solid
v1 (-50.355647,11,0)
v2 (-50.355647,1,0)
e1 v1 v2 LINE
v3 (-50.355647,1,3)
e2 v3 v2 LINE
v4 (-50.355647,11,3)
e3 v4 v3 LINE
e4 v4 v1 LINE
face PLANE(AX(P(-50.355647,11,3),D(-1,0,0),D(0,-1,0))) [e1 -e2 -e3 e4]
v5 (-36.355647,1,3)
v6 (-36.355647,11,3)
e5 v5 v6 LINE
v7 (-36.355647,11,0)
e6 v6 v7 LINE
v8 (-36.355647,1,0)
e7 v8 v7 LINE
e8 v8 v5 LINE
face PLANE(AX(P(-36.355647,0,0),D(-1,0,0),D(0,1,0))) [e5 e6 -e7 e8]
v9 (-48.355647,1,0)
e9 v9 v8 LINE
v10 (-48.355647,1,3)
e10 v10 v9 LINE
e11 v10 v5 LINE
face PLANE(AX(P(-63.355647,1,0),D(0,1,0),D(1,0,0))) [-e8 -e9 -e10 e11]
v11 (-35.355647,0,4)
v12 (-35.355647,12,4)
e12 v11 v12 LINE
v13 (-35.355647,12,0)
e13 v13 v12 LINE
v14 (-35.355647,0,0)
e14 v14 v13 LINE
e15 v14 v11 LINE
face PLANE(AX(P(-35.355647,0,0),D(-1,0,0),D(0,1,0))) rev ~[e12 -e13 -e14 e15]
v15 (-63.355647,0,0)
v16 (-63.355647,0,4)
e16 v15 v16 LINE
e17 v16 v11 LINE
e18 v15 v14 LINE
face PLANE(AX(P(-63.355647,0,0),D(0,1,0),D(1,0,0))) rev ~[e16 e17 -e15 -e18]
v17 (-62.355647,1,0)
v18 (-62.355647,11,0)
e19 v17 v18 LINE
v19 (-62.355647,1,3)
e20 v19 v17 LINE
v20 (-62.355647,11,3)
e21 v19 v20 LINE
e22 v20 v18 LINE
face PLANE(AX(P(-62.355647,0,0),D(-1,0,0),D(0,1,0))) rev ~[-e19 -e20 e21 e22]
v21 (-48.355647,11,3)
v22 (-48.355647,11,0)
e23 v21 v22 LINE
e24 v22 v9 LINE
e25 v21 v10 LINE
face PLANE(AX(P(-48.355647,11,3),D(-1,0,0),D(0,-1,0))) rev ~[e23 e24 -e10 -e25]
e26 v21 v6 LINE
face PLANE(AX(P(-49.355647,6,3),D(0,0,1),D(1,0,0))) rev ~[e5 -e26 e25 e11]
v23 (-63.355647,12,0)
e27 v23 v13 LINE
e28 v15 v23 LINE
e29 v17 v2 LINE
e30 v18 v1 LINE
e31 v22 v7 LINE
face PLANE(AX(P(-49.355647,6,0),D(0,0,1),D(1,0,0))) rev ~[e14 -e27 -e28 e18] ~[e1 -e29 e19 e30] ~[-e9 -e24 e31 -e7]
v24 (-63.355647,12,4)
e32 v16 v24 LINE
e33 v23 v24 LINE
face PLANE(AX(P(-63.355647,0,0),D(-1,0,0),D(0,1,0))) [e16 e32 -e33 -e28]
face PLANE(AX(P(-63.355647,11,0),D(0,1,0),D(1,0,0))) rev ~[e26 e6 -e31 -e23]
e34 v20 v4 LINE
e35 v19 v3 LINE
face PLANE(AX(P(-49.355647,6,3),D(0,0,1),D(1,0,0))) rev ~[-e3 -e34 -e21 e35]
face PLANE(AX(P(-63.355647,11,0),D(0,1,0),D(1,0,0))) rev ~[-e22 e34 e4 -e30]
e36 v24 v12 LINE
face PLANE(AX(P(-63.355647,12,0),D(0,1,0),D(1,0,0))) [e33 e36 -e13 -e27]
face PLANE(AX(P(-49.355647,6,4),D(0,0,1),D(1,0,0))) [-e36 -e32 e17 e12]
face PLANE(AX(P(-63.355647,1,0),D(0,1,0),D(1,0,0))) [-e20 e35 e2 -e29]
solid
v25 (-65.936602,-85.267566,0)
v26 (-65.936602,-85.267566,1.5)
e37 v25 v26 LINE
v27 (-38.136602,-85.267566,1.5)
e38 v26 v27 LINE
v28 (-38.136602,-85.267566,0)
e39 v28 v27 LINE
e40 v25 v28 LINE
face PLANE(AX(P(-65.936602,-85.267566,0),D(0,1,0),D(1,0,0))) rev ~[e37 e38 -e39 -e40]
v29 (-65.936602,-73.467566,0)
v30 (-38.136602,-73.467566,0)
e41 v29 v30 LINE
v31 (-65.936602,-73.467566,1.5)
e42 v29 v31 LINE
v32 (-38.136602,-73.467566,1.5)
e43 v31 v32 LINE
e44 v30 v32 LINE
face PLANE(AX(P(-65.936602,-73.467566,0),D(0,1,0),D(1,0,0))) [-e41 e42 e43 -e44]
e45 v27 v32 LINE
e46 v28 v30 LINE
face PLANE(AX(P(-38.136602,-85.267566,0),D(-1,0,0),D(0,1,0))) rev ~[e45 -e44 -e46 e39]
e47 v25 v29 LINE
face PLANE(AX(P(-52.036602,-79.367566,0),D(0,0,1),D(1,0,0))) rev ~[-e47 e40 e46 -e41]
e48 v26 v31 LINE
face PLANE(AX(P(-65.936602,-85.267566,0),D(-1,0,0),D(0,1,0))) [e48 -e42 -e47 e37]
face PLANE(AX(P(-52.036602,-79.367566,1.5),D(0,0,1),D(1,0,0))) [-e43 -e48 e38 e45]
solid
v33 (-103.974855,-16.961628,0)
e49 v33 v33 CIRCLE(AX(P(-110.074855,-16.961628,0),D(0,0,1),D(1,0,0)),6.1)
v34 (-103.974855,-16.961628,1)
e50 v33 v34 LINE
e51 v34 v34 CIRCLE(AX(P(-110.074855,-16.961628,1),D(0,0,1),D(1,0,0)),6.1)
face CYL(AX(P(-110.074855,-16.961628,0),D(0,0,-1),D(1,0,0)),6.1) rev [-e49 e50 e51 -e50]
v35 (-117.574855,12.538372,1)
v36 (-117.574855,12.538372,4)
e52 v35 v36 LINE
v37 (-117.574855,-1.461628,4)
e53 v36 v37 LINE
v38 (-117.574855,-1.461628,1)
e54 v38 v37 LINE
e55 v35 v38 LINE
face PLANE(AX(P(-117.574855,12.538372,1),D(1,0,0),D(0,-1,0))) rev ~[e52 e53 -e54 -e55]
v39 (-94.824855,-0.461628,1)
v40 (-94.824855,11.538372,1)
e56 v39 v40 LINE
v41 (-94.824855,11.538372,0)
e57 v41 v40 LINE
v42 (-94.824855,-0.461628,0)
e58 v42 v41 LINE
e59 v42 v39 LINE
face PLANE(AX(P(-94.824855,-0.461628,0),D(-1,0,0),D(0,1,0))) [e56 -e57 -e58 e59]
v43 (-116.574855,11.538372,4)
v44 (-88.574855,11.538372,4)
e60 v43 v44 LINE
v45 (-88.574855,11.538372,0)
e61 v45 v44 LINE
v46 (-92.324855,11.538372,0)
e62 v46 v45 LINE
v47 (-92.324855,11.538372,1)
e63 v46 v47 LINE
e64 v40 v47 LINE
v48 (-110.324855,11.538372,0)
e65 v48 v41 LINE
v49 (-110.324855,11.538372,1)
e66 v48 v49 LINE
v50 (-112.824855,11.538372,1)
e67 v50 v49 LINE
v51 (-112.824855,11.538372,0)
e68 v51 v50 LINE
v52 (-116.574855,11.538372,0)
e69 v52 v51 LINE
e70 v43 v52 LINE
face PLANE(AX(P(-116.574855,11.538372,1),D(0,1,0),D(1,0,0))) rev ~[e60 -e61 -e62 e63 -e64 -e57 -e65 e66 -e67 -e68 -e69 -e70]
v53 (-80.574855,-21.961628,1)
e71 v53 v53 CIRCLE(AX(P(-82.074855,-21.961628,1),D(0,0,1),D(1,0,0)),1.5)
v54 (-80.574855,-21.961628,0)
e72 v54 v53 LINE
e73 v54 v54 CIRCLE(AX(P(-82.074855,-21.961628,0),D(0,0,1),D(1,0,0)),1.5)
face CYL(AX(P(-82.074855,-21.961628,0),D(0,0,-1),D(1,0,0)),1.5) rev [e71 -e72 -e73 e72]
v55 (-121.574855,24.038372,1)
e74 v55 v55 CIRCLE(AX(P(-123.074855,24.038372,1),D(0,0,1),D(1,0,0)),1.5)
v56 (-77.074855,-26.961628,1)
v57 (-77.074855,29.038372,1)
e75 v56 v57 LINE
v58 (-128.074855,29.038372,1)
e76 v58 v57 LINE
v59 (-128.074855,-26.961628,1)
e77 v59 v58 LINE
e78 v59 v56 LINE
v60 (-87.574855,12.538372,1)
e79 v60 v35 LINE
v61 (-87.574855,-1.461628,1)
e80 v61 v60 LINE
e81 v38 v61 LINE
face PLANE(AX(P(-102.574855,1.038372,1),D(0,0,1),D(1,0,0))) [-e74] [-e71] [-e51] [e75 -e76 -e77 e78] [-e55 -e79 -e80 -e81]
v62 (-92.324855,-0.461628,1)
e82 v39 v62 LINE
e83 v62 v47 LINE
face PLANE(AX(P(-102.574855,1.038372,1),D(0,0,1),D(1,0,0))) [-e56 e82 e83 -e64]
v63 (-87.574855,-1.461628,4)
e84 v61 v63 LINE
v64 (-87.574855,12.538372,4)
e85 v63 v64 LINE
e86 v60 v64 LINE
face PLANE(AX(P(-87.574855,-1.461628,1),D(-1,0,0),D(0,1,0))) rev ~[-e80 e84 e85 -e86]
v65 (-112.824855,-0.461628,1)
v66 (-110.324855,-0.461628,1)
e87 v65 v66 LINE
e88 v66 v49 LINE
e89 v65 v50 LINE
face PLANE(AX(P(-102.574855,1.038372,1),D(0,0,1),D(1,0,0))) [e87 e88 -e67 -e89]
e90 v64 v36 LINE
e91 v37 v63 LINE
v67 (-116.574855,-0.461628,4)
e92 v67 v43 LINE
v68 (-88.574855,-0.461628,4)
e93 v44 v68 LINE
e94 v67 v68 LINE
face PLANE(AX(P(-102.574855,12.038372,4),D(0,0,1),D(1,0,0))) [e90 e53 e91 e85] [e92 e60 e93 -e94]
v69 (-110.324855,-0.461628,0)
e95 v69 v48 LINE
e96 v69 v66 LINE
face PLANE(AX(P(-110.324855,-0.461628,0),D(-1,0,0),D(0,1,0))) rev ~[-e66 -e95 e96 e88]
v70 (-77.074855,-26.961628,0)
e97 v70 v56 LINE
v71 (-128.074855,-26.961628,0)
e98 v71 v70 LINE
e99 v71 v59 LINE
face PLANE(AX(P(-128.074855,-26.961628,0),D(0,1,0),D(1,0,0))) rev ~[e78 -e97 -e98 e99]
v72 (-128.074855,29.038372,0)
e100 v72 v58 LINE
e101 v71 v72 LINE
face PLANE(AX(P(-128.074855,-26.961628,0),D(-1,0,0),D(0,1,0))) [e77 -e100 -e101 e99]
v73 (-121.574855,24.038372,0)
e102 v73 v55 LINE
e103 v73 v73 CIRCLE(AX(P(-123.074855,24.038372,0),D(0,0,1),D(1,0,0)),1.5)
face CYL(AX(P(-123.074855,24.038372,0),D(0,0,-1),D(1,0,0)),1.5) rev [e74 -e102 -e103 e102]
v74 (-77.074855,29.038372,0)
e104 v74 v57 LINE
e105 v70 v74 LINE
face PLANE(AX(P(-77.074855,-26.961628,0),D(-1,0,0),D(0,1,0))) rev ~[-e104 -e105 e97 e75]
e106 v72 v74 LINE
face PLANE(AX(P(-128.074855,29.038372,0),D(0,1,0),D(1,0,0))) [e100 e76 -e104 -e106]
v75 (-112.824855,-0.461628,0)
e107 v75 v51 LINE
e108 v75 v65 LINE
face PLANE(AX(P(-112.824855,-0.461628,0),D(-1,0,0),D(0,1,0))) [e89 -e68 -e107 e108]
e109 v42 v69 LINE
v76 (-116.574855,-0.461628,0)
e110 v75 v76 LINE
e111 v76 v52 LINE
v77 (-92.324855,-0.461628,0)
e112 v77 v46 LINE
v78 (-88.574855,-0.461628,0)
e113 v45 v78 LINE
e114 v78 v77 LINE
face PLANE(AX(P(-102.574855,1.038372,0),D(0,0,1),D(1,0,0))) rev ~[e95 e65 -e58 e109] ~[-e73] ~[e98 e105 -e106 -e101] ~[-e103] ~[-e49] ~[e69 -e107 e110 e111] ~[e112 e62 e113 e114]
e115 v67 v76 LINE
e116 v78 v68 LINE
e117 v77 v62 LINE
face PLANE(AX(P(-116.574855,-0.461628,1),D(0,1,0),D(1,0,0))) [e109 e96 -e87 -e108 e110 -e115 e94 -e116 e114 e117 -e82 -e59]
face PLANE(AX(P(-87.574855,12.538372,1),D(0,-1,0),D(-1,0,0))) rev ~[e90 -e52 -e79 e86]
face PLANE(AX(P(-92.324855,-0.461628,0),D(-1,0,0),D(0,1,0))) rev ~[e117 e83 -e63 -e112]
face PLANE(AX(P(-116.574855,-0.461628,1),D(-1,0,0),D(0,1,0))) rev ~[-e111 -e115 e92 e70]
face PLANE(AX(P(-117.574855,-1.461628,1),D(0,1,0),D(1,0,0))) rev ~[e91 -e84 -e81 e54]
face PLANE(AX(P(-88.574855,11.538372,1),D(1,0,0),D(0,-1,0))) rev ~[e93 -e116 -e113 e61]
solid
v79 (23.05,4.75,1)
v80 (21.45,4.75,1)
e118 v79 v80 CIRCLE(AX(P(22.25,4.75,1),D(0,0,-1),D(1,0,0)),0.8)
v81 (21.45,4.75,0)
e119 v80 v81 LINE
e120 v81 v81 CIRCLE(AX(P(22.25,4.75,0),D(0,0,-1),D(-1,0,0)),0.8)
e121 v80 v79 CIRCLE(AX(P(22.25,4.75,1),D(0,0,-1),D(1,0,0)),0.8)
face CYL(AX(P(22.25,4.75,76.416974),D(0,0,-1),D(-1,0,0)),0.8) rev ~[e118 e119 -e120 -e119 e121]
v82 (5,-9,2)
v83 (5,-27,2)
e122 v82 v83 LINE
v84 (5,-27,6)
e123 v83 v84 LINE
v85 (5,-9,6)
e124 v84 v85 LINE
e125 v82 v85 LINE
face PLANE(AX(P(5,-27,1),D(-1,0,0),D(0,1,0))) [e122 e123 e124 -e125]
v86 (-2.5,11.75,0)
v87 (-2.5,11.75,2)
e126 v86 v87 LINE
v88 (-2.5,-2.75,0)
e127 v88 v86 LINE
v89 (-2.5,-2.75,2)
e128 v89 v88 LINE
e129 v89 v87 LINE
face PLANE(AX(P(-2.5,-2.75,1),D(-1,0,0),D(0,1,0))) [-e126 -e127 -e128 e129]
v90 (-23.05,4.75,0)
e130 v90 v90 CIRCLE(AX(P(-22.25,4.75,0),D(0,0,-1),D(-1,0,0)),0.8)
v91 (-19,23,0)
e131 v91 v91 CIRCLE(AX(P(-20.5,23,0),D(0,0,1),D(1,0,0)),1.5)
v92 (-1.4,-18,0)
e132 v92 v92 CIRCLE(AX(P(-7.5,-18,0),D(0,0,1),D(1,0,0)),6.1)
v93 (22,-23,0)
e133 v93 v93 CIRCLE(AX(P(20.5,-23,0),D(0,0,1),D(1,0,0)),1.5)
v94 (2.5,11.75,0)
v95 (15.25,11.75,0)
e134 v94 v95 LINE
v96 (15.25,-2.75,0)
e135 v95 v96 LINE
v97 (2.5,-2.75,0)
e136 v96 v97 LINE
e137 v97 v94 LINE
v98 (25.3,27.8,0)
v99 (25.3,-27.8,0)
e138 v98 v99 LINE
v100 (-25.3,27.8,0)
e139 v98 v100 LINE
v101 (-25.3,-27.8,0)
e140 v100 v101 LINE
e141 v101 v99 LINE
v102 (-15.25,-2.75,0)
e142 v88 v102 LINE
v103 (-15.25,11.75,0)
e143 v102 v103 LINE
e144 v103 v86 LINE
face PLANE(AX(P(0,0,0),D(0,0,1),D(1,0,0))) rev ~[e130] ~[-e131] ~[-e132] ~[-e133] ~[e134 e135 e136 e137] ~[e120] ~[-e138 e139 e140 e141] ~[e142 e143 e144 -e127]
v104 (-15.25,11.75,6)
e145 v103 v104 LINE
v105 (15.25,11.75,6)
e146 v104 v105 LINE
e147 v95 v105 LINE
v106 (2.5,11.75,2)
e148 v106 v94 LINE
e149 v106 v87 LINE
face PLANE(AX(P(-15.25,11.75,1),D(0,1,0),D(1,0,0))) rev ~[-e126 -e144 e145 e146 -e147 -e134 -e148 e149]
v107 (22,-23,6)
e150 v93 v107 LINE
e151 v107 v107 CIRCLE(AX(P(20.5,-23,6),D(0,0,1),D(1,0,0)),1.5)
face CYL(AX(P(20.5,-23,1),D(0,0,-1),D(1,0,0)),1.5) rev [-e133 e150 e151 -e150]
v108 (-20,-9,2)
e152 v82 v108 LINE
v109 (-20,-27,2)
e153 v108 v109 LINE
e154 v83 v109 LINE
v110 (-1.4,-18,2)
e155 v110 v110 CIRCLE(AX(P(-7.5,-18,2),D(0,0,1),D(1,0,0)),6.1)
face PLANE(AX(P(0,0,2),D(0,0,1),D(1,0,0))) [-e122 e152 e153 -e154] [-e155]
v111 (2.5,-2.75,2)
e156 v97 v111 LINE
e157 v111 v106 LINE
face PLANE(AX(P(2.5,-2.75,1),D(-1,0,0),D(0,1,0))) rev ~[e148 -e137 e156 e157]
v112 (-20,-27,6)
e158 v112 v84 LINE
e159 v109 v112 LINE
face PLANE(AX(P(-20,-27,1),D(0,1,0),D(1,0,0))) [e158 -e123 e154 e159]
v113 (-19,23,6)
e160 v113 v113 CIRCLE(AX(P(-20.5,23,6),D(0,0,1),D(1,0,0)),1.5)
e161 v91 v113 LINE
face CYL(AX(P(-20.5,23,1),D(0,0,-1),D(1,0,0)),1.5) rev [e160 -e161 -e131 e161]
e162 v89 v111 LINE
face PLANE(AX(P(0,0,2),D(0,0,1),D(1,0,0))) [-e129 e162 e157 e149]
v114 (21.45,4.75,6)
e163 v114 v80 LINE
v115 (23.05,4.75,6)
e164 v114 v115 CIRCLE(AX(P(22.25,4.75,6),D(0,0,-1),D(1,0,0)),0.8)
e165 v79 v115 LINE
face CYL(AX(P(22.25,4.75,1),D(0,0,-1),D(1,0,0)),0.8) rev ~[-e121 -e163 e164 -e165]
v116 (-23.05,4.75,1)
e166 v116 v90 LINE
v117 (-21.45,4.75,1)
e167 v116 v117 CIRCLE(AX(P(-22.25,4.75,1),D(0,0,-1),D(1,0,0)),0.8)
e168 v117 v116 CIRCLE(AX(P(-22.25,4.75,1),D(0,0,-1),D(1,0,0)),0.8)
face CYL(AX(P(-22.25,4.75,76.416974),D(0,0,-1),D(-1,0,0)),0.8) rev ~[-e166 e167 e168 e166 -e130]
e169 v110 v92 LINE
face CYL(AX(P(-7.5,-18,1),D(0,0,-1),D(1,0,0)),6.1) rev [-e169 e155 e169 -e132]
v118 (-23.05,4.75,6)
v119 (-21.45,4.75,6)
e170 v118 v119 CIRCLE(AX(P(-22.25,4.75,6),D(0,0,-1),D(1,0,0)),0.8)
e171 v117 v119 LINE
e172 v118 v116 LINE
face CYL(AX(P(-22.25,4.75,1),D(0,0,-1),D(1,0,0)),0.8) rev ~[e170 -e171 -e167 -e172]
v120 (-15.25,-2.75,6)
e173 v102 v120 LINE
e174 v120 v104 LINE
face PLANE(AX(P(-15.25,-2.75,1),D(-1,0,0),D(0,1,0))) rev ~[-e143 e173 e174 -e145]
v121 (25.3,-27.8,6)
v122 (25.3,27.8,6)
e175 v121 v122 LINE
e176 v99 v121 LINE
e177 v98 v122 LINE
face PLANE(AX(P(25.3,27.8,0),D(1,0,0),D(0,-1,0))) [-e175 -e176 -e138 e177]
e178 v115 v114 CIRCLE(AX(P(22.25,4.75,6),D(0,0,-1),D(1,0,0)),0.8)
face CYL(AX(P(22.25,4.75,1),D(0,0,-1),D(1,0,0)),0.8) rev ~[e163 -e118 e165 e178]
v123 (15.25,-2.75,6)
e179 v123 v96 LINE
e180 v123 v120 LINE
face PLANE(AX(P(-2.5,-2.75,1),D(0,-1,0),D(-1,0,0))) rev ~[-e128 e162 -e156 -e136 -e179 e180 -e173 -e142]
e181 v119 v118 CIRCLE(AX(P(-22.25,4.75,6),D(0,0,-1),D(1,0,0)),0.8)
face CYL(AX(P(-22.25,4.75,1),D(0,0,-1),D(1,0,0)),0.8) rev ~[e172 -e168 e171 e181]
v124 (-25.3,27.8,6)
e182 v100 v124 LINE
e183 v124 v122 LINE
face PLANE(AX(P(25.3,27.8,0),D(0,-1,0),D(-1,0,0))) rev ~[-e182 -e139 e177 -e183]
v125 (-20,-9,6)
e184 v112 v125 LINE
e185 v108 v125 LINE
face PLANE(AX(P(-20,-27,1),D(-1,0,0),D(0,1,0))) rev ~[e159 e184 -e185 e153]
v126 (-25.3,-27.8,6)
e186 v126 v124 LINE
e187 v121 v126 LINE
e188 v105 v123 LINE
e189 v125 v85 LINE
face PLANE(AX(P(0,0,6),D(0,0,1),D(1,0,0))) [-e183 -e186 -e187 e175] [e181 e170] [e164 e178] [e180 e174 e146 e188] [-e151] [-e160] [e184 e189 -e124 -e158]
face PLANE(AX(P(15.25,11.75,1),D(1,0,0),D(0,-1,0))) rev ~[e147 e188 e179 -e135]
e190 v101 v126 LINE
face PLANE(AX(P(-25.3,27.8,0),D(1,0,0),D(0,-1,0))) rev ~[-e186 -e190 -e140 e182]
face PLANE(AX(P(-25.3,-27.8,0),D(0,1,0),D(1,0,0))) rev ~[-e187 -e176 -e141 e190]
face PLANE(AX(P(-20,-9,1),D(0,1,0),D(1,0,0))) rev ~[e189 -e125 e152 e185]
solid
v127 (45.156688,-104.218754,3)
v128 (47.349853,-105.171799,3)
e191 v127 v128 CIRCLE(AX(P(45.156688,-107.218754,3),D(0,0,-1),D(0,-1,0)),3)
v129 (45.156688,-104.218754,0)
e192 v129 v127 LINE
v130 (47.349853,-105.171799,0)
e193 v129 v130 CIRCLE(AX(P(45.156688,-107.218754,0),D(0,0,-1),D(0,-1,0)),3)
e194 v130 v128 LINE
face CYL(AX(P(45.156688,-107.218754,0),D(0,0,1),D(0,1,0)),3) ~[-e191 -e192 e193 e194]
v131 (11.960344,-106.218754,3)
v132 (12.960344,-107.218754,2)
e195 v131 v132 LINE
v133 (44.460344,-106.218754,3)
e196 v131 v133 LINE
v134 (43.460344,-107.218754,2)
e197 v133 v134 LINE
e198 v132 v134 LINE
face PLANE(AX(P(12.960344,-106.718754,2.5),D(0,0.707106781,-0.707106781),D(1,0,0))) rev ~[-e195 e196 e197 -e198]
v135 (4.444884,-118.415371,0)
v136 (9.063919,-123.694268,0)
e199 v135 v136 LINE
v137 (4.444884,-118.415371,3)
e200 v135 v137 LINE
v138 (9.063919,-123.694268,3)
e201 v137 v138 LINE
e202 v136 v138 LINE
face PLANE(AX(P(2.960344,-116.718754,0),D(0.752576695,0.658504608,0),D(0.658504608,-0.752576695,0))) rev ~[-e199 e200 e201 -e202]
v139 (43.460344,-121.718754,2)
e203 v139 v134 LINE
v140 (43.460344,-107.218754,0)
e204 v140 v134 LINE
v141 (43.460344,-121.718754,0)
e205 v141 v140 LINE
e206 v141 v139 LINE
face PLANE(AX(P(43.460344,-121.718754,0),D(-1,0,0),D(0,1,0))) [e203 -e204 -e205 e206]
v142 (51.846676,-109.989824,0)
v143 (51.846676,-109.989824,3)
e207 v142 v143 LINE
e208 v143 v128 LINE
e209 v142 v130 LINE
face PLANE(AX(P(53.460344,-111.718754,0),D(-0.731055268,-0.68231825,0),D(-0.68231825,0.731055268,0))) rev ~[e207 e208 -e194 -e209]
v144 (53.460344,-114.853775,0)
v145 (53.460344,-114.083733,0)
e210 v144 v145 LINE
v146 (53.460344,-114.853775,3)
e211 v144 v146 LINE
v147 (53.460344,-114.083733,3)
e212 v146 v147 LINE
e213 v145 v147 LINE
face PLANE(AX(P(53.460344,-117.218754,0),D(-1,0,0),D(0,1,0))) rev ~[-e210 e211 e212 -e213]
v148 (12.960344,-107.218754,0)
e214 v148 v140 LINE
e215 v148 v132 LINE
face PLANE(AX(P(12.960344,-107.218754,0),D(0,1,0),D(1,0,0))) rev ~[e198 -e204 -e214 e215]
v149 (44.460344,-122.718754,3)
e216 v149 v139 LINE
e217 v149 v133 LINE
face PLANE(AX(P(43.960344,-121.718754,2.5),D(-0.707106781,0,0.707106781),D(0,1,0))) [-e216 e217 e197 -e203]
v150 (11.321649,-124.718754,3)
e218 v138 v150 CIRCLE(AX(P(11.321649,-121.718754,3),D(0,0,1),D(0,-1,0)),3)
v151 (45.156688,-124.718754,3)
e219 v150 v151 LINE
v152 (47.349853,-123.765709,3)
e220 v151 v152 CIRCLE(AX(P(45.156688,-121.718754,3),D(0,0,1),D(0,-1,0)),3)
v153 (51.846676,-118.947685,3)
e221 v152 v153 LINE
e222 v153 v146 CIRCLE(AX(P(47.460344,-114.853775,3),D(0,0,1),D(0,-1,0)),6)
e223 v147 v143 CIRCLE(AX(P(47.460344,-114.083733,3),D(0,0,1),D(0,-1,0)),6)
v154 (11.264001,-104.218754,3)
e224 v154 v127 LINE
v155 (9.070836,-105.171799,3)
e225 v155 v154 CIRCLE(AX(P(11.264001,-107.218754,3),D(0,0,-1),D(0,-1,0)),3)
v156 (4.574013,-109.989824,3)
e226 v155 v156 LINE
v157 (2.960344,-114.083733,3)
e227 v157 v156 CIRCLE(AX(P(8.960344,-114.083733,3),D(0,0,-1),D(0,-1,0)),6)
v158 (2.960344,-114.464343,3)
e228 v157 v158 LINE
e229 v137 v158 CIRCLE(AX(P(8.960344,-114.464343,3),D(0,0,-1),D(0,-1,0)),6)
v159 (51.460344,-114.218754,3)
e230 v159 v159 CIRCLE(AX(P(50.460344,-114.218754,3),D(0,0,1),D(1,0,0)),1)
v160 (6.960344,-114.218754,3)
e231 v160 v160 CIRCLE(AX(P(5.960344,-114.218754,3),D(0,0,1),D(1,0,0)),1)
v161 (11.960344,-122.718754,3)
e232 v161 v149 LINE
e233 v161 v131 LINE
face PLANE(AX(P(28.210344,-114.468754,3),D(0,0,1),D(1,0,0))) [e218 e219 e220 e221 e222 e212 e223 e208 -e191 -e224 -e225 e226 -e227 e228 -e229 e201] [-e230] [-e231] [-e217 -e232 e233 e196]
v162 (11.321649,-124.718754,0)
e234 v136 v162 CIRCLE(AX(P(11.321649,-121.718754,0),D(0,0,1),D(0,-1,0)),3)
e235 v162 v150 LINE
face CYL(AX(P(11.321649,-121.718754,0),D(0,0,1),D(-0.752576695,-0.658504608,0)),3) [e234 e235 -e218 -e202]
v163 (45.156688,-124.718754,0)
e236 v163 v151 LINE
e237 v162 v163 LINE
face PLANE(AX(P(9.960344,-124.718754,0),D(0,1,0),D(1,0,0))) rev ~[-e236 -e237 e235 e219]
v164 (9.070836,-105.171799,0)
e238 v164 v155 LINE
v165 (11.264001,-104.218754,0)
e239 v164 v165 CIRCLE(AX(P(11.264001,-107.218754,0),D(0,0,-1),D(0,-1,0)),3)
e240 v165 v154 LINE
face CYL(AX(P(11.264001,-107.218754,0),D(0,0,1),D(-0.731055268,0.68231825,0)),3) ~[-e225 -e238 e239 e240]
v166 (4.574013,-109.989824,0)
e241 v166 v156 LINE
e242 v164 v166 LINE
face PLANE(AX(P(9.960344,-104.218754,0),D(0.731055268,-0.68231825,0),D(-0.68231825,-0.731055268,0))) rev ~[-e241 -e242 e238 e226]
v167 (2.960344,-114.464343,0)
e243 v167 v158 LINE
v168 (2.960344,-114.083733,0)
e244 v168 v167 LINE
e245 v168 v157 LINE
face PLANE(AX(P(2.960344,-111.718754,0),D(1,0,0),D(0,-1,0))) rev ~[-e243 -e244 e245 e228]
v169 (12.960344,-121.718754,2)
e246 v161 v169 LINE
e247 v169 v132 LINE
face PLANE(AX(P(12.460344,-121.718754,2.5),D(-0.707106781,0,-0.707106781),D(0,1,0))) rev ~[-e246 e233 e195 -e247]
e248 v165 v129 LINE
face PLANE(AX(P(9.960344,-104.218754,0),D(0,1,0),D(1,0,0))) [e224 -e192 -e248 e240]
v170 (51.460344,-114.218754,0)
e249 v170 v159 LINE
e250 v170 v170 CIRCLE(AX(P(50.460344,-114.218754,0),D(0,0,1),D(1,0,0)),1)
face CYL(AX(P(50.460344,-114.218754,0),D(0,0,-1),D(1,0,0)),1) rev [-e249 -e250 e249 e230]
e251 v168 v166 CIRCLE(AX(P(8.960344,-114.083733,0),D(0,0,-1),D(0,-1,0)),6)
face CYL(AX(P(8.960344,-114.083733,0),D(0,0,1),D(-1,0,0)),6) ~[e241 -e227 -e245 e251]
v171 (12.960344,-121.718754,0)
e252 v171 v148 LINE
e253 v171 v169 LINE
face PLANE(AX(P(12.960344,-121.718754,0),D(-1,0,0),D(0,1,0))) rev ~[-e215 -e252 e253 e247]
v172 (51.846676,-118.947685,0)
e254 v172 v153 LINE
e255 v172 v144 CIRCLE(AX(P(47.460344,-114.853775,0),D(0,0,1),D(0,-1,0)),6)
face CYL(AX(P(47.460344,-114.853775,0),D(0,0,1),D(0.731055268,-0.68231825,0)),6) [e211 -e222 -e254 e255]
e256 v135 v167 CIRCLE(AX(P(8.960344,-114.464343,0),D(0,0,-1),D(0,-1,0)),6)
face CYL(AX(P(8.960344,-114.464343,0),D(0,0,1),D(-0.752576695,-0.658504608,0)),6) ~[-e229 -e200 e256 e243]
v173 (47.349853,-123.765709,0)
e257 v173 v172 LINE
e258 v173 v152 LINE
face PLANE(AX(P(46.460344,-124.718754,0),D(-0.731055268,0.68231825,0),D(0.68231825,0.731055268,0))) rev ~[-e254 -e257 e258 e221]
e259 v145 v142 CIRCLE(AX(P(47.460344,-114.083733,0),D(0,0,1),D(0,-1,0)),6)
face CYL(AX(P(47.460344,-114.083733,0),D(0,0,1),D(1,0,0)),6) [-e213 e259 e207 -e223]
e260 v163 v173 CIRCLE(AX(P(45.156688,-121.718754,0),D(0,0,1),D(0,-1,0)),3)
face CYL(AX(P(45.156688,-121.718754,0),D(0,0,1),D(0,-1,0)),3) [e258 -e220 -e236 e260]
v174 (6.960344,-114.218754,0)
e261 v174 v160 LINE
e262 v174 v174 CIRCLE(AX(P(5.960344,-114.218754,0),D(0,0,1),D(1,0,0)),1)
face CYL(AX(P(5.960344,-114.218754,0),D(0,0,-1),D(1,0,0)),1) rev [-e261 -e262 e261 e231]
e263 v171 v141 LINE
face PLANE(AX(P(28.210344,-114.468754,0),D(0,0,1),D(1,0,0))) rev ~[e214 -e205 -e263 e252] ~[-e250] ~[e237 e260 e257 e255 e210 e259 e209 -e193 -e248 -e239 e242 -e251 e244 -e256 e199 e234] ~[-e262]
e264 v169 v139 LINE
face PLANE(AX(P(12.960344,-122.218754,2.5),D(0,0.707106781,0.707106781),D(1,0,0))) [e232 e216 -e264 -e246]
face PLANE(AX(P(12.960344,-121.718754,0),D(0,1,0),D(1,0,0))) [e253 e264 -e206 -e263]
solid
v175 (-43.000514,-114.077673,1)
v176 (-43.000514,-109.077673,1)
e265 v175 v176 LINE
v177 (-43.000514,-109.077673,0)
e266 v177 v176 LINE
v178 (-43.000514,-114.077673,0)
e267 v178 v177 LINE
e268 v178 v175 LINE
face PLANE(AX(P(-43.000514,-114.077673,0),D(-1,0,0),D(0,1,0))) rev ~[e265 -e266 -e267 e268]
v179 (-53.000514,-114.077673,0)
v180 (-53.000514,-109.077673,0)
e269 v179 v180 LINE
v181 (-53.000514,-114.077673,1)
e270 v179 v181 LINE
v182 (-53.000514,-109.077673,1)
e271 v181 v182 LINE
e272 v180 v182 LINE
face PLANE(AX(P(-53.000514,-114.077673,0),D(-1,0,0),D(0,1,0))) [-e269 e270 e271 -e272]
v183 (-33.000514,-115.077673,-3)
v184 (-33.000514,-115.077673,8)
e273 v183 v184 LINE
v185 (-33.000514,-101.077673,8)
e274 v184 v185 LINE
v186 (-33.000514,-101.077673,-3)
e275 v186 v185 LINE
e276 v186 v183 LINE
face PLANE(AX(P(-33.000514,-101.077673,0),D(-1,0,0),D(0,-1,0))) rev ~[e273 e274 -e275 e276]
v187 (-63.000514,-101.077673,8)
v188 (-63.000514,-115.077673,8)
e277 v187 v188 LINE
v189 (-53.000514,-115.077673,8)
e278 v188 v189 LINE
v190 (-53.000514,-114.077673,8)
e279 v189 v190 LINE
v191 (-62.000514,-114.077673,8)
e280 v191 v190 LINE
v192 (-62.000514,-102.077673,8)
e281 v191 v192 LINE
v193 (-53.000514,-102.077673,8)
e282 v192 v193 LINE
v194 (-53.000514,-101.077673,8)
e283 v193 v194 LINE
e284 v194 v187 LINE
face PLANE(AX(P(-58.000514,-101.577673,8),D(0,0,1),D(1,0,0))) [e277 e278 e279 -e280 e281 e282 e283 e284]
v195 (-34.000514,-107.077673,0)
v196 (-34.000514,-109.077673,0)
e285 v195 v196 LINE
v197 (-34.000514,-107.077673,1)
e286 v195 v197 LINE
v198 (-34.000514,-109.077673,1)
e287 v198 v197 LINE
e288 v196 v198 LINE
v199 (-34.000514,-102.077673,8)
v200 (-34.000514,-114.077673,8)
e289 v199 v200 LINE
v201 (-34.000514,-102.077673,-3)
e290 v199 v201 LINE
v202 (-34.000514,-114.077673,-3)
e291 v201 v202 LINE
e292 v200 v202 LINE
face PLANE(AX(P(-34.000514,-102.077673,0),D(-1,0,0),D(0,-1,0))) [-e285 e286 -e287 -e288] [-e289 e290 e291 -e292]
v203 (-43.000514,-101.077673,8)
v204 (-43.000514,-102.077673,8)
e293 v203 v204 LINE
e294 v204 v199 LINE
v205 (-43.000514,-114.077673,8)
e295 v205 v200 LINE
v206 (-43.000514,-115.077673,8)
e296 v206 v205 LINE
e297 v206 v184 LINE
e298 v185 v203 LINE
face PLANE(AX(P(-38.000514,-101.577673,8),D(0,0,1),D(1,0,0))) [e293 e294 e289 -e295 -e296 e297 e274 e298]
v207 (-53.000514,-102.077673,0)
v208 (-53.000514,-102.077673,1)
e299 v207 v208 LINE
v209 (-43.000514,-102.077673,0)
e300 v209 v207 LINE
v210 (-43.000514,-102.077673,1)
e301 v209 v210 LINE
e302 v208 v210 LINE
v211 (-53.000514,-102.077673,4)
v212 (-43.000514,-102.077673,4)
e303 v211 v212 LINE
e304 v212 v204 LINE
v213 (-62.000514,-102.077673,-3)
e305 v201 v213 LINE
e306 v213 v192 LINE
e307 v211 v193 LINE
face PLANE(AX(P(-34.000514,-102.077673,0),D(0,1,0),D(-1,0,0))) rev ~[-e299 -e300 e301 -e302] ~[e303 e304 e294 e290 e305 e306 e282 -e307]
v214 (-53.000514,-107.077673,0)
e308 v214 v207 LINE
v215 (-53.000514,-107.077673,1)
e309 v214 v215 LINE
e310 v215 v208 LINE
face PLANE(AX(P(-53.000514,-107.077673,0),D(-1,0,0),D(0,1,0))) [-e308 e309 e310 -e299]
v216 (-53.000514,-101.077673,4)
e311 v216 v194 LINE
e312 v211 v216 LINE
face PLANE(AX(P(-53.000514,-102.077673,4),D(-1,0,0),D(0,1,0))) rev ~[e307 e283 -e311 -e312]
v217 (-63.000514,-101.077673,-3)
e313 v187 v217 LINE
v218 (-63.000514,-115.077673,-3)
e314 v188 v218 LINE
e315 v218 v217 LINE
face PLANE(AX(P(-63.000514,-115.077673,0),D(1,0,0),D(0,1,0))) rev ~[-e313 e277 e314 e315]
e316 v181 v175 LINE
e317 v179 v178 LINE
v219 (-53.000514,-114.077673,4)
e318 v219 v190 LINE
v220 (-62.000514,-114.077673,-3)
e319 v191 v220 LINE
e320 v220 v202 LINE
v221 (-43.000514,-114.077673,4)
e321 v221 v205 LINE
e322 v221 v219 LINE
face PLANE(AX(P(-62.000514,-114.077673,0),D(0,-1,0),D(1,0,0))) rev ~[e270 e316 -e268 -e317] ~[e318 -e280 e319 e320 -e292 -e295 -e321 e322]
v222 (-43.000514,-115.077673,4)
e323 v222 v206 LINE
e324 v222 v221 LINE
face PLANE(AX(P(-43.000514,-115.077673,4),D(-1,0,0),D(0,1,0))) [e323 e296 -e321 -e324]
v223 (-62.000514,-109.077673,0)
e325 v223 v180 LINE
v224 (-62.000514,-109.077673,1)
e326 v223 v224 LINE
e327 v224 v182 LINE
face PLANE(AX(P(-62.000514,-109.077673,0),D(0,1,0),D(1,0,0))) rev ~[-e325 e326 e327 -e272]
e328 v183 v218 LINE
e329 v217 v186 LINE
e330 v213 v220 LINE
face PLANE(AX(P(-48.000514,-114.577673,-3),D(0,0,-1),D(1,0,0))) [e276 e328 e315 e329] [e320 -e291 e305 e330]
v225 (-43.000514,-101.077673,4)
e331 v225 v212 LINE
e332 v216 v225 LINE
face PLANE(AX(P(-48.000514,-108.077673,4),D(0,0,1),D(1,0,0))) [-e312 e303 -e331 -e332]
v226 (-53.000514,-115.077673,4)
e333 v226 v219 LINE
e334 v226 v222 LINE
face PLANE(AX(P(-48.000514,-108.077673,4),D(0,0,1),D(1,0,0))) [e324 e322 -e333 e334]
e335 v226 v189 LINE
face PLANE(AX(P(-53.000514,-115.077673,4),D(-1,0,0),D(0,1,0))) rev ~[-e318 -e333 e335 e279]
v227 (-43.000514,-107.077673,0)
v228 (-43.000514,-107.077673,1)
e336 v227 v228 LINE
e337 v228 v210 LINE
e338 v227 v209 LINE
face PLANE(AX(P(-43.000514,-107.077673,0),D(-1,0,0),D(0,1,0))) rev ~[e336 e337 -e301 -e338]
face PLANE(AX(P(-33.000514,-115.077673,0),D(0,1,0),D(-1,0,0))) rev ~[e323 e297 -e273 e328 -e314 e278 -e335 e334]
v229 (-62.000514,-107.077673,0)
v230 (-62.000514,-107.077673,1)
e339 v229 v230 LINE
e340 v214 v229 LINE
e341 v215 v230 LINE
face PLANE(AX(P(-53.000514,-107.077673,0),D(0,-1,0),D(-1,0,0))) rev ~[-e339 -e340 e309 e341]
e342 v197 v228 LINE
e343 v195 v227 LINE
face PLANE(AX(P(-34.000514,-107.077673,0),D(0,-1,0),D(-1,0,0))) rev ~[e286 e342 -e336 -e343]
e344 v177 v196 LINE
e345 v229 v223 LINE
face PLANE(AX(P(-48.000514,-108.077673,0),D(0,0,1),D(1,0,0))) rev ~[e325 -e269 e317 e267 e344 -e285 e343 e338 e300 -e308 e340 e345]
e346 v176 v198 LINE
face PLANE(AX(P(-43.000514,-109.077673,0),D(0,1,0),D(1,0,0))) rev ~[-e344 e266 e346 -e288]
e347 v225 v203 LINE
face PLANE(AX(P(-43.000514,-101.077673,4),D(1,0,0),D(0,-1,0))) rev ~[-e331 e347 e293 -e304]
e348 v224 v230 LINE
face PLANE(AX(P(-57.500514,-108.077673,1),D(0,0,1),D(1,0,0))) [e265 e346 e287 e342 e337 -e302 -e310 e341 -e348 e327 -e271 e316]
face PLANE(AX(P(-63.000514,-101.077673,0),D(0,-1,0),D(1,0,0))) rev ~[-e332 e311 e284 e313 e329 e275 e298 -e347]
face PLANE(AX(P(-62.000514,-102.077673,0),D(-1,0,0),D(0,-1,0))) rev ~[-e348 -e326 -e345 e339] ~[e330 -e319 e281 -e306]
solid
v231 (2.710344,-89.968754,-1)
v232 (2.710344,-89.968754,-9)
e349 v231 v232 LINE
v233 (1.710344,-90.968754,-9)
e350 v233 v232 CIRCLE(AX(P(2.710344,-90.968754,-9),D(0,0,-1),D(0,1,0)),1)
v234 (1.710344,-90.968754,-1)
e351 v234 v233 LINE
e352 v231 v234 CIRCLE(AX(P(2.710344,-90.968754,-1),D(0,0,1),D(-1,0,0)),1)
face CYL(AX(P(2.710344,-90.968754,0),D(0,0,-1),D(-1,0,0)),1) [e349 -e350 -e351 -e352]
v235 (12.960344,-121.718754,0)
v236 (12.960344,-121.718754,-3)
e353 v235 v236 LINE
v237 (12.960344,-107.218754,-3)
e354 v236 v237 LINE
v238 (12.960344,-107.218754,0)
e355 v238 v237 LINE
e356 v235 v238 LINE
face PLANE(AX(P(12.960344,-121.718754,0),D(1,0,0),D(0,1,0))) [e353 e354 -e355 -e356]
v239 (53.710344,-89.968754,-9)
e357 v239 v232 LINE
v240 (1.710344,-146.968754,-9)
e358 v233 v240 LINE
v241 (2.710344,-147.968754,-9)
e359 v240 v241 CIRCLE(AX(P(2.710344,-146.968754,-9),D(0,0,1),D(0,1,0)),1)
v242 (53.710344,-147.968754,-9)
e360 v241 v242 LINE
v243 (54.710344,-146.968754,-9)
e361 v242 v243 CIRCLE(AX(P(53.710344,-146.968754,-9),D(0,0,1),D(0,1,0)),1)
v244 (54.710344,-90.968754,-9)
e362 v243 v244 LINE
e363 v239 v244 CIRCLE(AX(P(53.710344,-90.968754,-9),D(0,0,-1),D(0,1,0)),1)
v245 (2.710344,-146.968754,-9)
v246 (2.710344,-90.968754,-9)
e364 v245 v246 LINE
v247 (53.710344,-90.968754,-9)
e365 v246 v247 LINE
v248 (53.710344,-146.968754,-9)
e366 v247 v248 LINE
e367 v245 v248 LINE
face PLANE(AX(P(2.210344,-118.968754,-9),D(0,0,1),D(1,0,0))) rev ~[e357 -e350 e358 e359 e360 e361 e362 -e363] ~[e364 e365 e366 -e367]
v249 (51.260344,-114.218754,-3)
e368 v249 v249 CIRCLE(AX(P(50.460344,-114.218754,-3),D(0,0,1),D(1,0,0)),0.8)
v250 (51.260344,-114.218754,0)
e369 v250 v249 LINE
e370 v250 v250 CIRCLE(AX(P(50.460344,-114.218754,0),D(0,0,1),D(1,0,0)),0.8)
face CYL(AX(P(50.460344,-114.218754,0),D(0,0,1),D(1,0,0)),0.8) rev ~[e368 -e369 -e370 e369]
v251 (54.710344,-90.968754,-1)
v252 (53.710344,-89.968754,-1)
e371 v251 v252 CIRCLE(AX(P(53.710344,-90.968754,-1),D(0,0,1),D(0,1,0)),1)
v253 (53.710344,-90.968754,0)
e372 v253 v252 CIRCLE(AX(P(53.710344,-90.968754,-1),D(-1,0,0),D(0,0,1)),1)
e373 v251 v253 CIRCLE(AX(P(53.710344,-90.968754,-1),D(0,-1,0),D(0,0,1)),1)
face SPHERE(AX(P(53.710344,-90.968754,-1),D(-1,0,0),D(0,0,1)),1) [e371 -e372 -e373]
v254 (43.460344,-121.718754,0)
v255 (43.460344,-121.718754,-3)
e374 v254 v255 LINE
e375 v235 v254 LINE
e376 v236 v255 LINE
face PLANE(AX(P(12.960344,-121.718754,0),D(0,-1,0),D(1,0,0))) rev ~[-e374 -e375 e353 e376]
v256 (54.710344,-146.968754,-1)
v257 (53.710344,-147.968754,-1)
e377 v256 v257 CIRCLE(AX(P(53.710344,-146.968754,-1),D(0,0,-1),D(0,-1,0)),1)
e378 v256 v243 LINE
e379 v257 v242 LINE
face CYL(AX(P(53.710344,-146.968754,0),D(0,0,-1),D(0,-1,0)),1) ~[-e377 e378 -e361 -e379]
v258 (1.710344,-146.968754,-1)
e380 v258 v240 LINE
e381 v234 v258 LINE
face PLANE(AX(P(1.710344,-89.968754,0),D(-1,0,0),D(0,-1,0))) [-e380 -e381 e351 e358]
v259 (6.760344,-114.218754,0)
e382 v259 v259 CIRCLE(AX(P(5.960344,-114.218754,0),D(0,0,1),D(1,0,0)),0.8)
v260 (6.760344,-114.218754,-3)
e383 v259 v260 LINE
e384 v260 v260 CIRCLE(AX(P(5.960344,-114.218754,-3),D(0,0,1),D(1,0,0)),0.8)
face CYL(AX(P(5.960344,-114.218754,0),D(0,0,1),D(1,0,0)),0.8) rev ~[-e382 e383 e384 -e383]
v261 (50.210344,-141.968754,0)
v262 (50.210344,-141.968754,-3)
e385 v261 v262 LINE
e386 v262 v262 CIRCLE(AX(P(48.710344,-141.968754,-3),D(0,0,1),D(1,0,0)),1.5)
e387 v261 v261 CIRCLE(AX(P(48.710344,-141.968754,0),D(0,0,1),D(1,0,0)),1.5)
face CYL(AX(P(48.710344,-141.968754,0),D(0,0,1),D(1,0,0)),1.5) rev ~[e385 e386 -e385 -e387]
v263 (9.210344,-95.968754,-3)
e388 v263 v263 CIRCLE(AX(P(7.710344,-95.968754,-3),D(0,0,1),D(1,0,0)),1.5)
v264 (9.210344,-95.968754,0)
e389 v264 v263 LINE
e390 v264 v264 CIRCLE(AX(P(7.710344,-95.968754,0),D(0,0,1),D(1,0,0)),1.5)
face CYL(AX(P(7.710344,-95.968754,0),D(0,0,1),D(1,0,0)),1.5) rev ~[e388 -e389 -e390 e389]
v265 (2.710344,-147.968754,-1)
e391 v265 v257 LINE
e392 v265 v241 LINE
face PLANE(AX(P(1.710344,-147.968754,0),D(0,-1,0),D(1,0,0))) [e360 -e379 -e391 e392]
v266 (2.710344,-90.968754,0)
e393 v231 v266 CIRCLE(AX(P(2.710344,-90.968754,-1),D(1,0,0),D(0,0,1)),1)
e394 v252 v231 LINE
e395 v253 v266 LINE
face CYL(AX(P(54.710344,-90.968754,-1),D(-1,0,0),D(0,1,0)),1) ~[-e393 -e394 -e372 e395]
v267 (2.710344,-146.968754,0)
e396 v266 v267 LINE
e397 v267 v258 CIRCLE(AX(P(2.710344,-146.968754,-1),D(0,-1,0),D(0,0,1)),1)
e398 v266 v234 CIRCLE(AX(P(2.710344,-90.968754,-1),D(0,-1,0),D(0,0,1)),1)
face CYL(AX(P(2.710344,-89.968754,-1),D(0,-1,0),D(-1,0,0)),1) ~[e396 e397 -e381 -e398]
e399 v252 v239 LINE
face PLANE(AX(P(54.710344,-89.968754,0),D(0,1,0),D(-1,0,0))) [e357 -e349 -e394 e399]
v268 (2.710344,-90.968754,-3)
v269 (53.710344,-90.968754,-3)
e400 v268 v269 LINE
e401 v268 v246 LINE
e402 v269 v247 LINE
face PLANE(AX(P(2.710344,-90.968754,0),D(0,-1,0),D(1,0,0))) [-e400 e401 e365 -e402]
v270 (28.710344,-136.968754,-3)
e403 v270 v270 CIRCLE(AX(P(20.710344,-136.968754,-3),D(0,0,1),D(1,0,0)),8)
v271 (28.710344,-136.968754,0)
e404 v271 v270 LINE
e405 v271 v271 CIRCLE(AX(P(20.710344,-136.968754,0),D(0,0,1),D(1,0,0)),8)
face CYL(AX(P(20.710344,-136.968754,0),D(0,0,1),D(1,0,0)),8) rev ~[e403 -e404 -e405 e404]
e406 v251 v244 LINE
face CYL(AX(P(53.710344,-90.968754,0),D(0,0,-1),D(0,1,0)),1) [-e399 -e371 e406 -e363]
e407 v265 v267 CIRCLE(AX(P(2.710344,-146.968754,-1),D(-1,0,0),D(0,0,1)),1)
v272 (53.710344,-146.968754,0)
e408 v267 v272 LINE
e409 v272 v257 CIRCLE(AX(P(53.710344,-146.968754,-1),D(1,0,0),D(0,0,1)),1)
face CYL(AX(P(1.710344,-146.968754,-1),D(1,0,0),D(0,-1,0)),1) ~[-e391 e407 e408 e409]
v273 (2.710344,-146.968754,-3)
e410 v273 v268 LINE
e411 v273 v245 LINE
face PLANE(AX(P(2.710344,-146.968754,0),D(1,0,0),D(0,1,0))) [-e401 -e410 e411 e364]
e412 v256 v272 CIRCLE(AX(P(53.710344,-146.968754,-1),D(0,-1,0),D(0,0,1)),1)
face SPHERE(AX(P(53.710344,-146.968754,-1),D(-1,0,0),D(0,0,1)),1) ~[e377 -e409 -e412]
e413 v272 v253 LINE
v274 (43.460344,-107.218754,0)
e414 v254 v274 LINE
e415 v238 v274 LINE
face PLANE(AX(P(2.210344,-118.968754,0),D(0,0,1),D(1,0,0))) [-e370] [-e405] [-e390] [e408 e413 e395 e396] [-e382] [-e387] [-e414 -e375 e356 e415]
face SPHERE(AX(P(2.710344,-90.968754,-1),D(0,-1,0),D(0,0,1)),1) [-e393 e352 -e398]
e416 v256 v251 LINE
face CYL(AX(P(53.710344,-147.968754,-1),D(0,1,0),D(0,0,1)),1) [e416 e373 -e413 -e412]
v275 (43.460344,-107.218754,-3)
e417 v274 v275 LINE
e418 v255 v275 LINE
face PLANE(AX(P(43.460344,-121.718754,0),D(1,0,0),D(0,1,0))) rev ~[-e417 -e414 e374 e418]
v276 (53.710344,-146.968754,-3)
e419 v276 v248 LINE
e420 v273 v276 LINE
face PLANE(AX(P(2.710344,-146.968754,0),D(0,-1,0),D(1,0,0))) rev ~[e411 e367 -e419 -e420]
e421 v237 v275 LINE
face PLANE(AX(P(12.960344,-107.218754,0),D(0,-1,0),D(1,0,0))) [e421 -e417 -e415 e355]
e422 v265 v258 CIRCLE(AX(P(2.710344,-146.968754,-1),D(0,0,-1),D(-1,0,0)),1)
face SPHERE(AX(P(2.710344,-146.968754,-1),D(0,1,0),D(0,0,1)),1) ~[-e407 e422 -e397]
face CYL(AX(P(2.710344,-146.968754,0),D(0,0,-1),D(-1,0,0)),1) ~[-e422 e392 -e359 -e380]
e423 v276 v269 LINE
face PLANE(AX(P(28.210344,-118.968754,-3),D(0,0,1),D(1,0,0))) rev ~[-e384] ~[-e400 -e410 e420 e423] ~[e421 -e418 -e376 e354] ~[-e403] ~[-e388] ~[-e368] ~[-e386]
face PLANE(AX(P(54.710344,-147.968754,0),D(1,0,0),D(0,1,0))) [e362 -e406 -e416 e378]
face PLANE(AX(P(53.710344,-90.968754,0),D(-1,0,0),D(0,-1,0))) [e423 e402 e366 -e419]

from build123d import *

# Parameters (mm, degrees)
F0_W      = 51
F0_H      = 56
F0_R      = 1.5
F0_R_2    = 6.1
F0_W_2    = 5
F0_H_2    = 14.5
F1_DEPTH  = 1
F0_W_3    = 2.5
F0_H_3    = 12
F3_W      = 28
F3_H      = 1
F4_DEPTH  = 3
F5_W      = 28
F5_H      = 12
F6_DEPTH  = 4
F7_T      = -1
F8_W      = 2
F8_H      = 10
F9_DEPTH  = 3
F2_W      = 30
F2_H      = 14
F11_DEPTH = 4
F2_W_2    = 51
F2_H_2    = 56
F2_R      = 8
F2_R_2    = 1.5
F2_R_3    = 0.8
F2_W_3    = 30.5
F2_H_3    = 14.5
F12_DEPTH = 3
F2_W_4    = 9
F2_H_4    = 2
F2_W_5    = 10
F2_H_5    = 5
F13_DEPTH = 1
F5_W_2    = 27.8
F5_H_2    = 11.8
F14_DEPTH = 1.5
F2_H_6    = 1
F15_DEPTH = 9
F16_W     = 36.5
F16_H     = 20.5
F16_W_2   = 30.5
F16_H_2   = 14.5
F16_R     = 1
F17_DEPTH = 3
F18_R     = 6
F19_R     = 3
F20_R     = 1
F21_SIZE  = 1
F23_W     = 9
F23_H     = 1
F24_DEPTH = 4
F25_DEPTH = 1
F26_D     = 1.4
F26_DEPTH = 1.001
F28_D     = 1.4
F27_W     = 1
F27_H     = 12
F29_DEPTH = 3
F22_W     = 51
F22_H     = 56
F22_W_2   = 25
F22_H_2   = 18
F22_R     = 1.5
F30_DEPTH = 5
F31_W     = 0.2
F31_H     = 55.6
F32_DEPTH = 25
F33_D     = 1.6
F33_DEPTH = 5.001
F34_D     = 1.6


# Not quite as in the source:
# - a feature names something its author has since deleted; it is built from what else it names


with BuildPart() as f1:
    # F0 (on Top) → F1 (new body)
    with BuildSketch(Plane.XY):
        Rectangle(F0_W, F0_H)
        with Locations((20.5, -23)):
            Circle(F0_R, mode=Mode.SUBTRACT)
        with Locations((-7.5, -18)):
            Circle(F0_R_2, mode=Mode.SUBTRACT)
        Polygon((-15.25, -2.75), (-15.25, 11.75), (-2.5, 11.75), (2.5, 11.75), (15.25, 11.75), (15.25, -2.75), (2.5, -2.75), (-2.5, -2.75), align=None, mode=Mode.SUBTRACT)
        with Locations((-20.5, 23)):
            Circle(F0_R, mode=Mode.SUBTRACT)
        with Locations((0, 4.5)):
            Rectangle(F0_W_2, F0_H_2)
    extrude(amount=F1_DEPTH)

    # F25 (add): a face of the model
    f25_faces = [f1.faces().sort_by_distance(p)[0] for p in [
        (0.3722548806, 0.1869472989, 1),
    ]]
    extrude(f25_faces, amount=F25_DEPTH)

    # F26 (through all, one way)
    with BuildSketch(Plane.XY.offset(1)):
        with Locations((-22.25, 4.75), (22.25, 4.75)):
            Circle(F26_D / 2)
    extrude(amount=-F26_DEPTH, mode=Mode.SUBTRACT)

    # F28 (through all)
    with Locations(Plane(origin=(0, 0, 1), x_dir=(1, 0, 0), z_dir=(0, 0, -1))):
        with Locations((-22.25, -4.75), (22.25, -4.75)):
            Hole(F28_D / 2)

    # F22 (on face) → F30 (join)
    with BuildSketch(Plane.XY.offset(1)):
        Rectangle(F22_W, F22_H)
        with Locations((-7.5, -18)):
            Rectangle(F22_W_2, F22_H_2, mode=Mode.SUBTRACT)
        with Locations((20.5, -23)):
            Circle(F22_R, mode=Mode.SUBTRACT)
        with Locations((-20.5, 23)):
            Circle(F22_R, mode=Mode.SUBTRACT)
        Polygon((-15.25, -2.75), (-15.25, 11.75), (-2.5, 11.75), (2.5, 11.75), (15.25, 11.75), (15.25, -2.75), (2.5, -2.75), (-2.5, -2.75), align=None, mode=Mode.SUBTRACT)
    extrude(amount=F30_DEPTH)

    # F31 (on face) → F32 (cut)
    with BuildSketch(Plane(origin=(0, 0, 0), x_dir=(1, 0, 0), z_dir=(0, 0, -1))):
        Polygon((25.5, 28), (-25.5, 28), (-25.5, 27.8), (-25.3, 27.8), (25.3, 27.8), (25.5, 27.8), align=None)
        with Locations((-25.4, 0)):
            Rectangle(F31_W, F31_H)
        with Locations((25.4, 0)):
            Rectangle(F31_W, F31_H)
        Polygon((-25.3, -27.8), (-25.5, -27.8), (-25.5, -28), (25.5, -28), (25.5, -27.8), (25.3, -27.8), align=None)
    extrude(amount=-F32_DEPTH, mode=Mode.SUBTRACT)

    # F33 (through all, one way)
    with BuildSketch(Plane(origin=(0, 0, 1), x_dir=(1, 0, 0), z_dir=(0, 0, -1))):
        with Locations((-22.25, -4.75), (22.25, -4.75)):
            Circle(F33_D / 2)
    extrude(amount=-F33_DEPTH, mode=Mode.SUBTRACT)

    # F34 (through all)
    with Locations(Plane.XY.offset(1)):
        with Locations((22.25, 4.75), (-22.25, 4.75)):
            Hole(F34_D / 2)


with BuildPart() as f1b:
    # F0 (on Top) → F1, piece 2 (new body)
    with BuildSketch(Plane.XY):
        with Locations((-102.5748546124, 1.0383715183)):
            Rectangle(F0_W, F0_H)
        with Locations((-110.0748546124, -16.9616284817)):
            Circle(F0_R_2, mode=Mode.SUBTRACT)
        with Locations((-82.0748546124, -21.9616284817)):
            Circle(F0_R, mode=Mode.SUBTRACT)
        Polygon((-116.5748546124, -0.4616284817), (-116.5748546124, 11.5383715183), (-112.8248546124, 11.5383715183), (-110.3248546124, 11.5383715183), (-94.8248546124, 11.5383715183), (-92.3248546124, 11.5383715183), (-88.5748546124, 11.5383715183), (-88.5748546124, -0.4616284817), (-92.3248546124, -0.4616284817), (-94.8248546124, -0.4616284817), (-110.3248546124, -0.4616284817), (-112.8248546124, -0.4616284817), align=None, mode=Mode.SUBTRACT)
        with Locations((-123.0748546124, 24.0383715183)):
            Circle(F0_R, mode=Mode.SUBTRACT)
        with Locations((-111.5748546124, 5.5383715183)):
            Rectangle(F0_W_3, F0_H_3)
        with Locations((-93.5748546124, 5.5383715183)):
            Rectangle(F0_W_3, F0_H_3)
    extrude(amount=F1_DEPTH)

    # F3 (on face) → F4 (join)
    with BuildSketch(Plane.XY.offset(1)):
        with Locations((-102.5748546124, 12.0383715183)):
            Rectangle(F3_W, F3_H)
        Polygon((-116.5748546124, -0.4616284817), (-116.5748546124, 11.5383715183), (-116.5748546124, 12.5383715183), (-117.5748546124, 12.5383715183), (-117.5748546124, -1.4616284817), (-116.5748546124, -1.4616284817), align=None)
        Polygon((-88.5748546124, 12.5383715183), (-88.5748546124, 11.5383715183), (-88.5748546124, -0.4616284817), (-88.5748546124, -1.4616284817), (-87.5748546124, -1.4616284817), (-87.5748546124, 12.5383715183), align=None)
        with Locations((-102.5748546124, -0.9616284817)):
            Rectangle(F3_W, F3_H)
    extrude(amount=F4_DEPTH)


with BuildPart() as f6:
    # F5 (on Top) → F6 (new body)
    with BuildSketch(Plane.XY):
        with Locations((-49.3556470275, 6)):
            Rectangle(F5_W, F5_H)
    extrude(amount=F6_DEPTH)

    # F7
    f7_openings = [f6.faces().sort_by_distance(p)[0] for p in [
        (-49.355647, 6, 0),
    ]]
    offset(amount=F7_T, openings=f7_openings)

    # F8 (on face) → F9 (join)
    with BuildSketch(Plane(origin=(0, 0, 3), x_dir=(1, 0, 0), z_dir=(0, 0, -1))):
        with Locations((-49.3556470275, -6)):
            Rectangle(F8_W, F8_H)
    extrude(amount=F9_DEPTH)


with BuildPart() as f11:
    # F2 (on Top) → F11 (new body)
    with BuildSketch(Plane.XY):
        with Locations((-48.0005137329, -108.0776734079)):
            Rectangle(F2_W, F2_H)
        Polygon((-62.0005137329, -107.0776734079), (-62.0005137329, -102.0776734079), (-53.0005137329, -102.0776734079), (-43.0005137329, -102.0776734079), (-34.0005137329, -102.0776734079), (-34.0005137329, -107.0776734079), (-34.0005137329, -109.0776734079), (-34.0005137329, -114.0776734079), (-43.0005137329, -114.0776734079), (-53.0005137329, -114.0776734079), (-62.0005137329, -114.0776734079), (-62.0005137329, -109.0776734079), align=None, mode=Mode.SUBTRACT)
    extrude(amount=F11_DEPTH)

    # F2 (on Top) → F13 (join)
    with BuildSketch(Plane.XY):
        with Locations((-57.5005137329, -108.0776734079)):
            Rectangle(F2_W_4, F2_H_4)
        with Locations((-48.0005137329, -108.0776734079)):
            Rectangle(F2_W_5, F2_H_4)
        with Locations((-38.5005137329, -108.0776734079)):
            Rectangle(F2_W_4, F2_H_4)
        with Locations((-48.0005137329, -104.5776734079)):
            Rectangle(F2_W_5, F2_H_5)
        with Locations((-48.0005137329, -111.5776734079)):
            Rectangle(F2_W_5, F2_H_5)
    extrude(amount=F13_DEPTH)

    # F23 (on face) → F24 (join)
    with BuildSketch(Plane.XY.offset(4)):
        Polygon((-53.0005137329, -101.0776734079), (-63.0005137329, -101.0776734079), (-63.0005137329, -102.0776734079), (-62.0005137329, -102.0776734079), (-53.0005137329, -102.0776734079), align=None)
        Polygon((-62.0005137329, -102.0776734079), (-63.0005137329, -102.0776734079), (-63.0005137329, -115.0776734079), (-62.0005137329, -115.0776734079), (-62.0005137329, -114.0776734079), align=None)
        with Locations((-57.5005137329, -114.5776734079)):
            Rectangle(F23_W, F23_H)
        Polygon((-33.0005137329, -102.0776734079), (-33.0005137329, -101.0776734079), (-43.0005137329, -101.0776734079), (-43.0005137329, -102.0776734079), (-34.0005137329, -102.0776734079), align=None)
        Polygon((-33.0005137329, -115.0776734079), (-33.0005137329, -102.0776734079), (-34.0005137329, -102.0776734079), (-34.0005137329, -114.0776734079), (-34.0005137329, -115.0776734079), align=None)
        with Locations((-38.5005137329, -114.5776734079)):
            Rectangle(F23_W, F23_H)
    extrude(amount=F24_DEPTH)

    # F27 (on face) → F29 (join)
    with BuildSketch(Plane(origin=(0, 0, 0), x_dir=(1, 0, 0), z_dir=(0, 0, -1))):
        Polygon((-33.0005137329, 115.0776734079), (-63.0005137329, 115.0776734079), (-63.0005137329, 114.0776734079), (-62.0005137329, 114.0776734079), (-34.0005137329, 114.0776734079), (-33.0005137329, 114.0776734079), align=None)
        Polygon((-62.0005137329, 114.0776734079), (-63.0005137329, 114.0776734079), (-63.0005137329, 101.0776734079), (-62.0005137329, 101.0776734079), (-62.0005137329, 102.0776734079), align=None)
        with Locations((-33.5005137329, 108.0776734079)):
            Rectangle(F27_W, F27_H)
        Polygon((-33.0005137329, 101.0776734079), (-33.0005137329, 102.0776734079), (-34.0005137329, 102.0776734079), (-62.0005137329, 102.0776734079), (-62.0005137329, 101.0776734079), align=None)
    extrude(amount=F29_DEPTH)


with BuildPart() as f12:
    # F2 (on Top) → F12 (new body)
    with BuildSketch(Plane.XY):
        with Locations((28.2103444552, -118.9687541723)):
            Rectangle(F2_W_2, F2_H_2)
        with Locations((20.7103444552, -136.9687541723)):
            Circle(F2_R, mode=Mode.SUBTRACT)
        with Locations((48.7103444552, -141.9687541723)):
            Circle(F2_R_2, mode=Mode.SUBTRACT)
        with Locations((5.9603444552, -114.2187541723)):
            Circle(F2_R_3, mode=Mode.SUBTRACT)
        with Locations((28.2103444552, -114.4687541723)):
            Rectangle(F2_W_3, F2_H_3, mode=Mode.SUBTRACT)
        with Locations((50.4603444552, -114.2187541723)):
            Circle(F2_R_3, mode=Mode.SUBTRACT)
        with Locations((7.7103444552, -95.9687541723)):
            Circle(F2_R_2, mode=Mode.SUBTRACT)
    extrude(amount=-F12_DEPTH)

    # F2 (on Top) → F15 (join)
    with BuildSketch(Plane.XY):
        Polygon((2.7103444552, -146.9687541723), (2.7103444552, -90.9687541723), (2.7103444552, -89.9687541723), (1.7103444552, -89.9687541723), (1.7103444552, -147.9687541723), (2.7103444552, -147.9687541723), align=None)
        with Locations((28.2103444552, -90.4687541723)):
            Rectangle(F2_W_2, F2_H_6)
        with Locations((28.2103444552, -147.4687541723)):
            Rectangle(F2_W_2, F2_H_6)
        Polygon((53.7103444552, -89.9687541723), (53.7103444552, -90.9687541723), (53.7103444552, -146.9687541723), (53.7103444552, -147.9687541723), (54.7103444552, -147.9687541723), (54.7103444552, -89.9687541723), align=None)
    extrude(amount=-F15_DEPTH)

    # F20
    f20_edges = [f12.edges().sort_by_distance(p)[0] for p in [
        (1.710344, -118.968754, 0),
        (28.210344, -89.968754, 0),
        (28.210344, -147.968754, 0),
        (54.710344, -118.968754, 0),
        (54.710344, -147.968754, -4.5),
        (1.710344, -147.968754, -4.5),
        (1.710344, -89.968754, -4.5),
        (54.710344, -89.968754, -4.5),
    ]]
    fillet(f20_edges, radius=F20_R)


with BuildPart() as f14:
    # F5 (on Top) → F14 (new body)
    with BuildSketch(Plane.XY):
        with Locations((-52.0366017878, -79.3675661445)):
            Rectangle(F5_W_2, F5_H_2)
    extrude(amount=F14_DEPTH)


with BuildPart() as f17:
    # F16 (on face) → F17 (new body)
    with BuildSketch(Plane.XY):
        with Locations((28.2103444552, -114.4687541723)):
            Rectangle(F16_W, F16_H)
        with Locations((28.2103444552, -114.4687541723)):
            Rectangle(F16_W_2, F16_H_2, mode=Mode.SUBTRACT)
        Polygon((9.9603444552, -124.7187541723), (9.9603444552, -104.2187541723), (2.9603444552, -111.7187541723), (2.9603444552, -116.7187541723), align=None)
        with Locations((5.9603444552, -114.2187541723)):
            Circle(F16_R, mode=Mode.SUBTRACT)
        Polygon((53.4603444552, -111.7187541723), (46.4603444552, -104.2187541723), (46.4603444552, -124.7187541723), (53.4603444552, -117.2187541723), align=None)
        with Locations((50.4603444552, -114.2187541723)):
            Circle(F16_R, mode=Mode.SUBTRACT)
    extrude(amount=F17_DEPTH)

    # F18
    f18_edges = [f17.edges().sort_by_distance(p)[0] for p in [
        (2.960344, -111.718754, 1.5),
        (2.960344, -116.718754, 1.5),
        (53.460344, -117.218754, 1.5),
        (53.460344, -111.718754, 1.5),
    ]]
    fillet(f18_edges, radius=F18_R)

    # F19
    f19_edges = [f17.edges().sort_by_distance(p)[0] for p in [
        (9.960344, -104.218754, 1.5),
        (9.960344, -124.718754, 1.5),
        (46.460344, -124.718754, 1.5),
        (46.460344, -104.218754, 1.5),
    ]]
    fillet(f19_edges, radius=F19_R)

    # F21
    f21_edges = [f17.edges().sort_by_distance(p)[0] for p in [
        (12.960344, -114.468754, 3),
        (28.210344, -107.218754, 3),
        (43.460344, -114.468754, 3),
        (28.210344, -121.718754, 3),
    ]]
    chamfer(f21_edges, length=F21_SIZE)


solid = Compound([f1.part, f1b.part, f6.part, f11.part, f12.part, f14.part, f17.part])
